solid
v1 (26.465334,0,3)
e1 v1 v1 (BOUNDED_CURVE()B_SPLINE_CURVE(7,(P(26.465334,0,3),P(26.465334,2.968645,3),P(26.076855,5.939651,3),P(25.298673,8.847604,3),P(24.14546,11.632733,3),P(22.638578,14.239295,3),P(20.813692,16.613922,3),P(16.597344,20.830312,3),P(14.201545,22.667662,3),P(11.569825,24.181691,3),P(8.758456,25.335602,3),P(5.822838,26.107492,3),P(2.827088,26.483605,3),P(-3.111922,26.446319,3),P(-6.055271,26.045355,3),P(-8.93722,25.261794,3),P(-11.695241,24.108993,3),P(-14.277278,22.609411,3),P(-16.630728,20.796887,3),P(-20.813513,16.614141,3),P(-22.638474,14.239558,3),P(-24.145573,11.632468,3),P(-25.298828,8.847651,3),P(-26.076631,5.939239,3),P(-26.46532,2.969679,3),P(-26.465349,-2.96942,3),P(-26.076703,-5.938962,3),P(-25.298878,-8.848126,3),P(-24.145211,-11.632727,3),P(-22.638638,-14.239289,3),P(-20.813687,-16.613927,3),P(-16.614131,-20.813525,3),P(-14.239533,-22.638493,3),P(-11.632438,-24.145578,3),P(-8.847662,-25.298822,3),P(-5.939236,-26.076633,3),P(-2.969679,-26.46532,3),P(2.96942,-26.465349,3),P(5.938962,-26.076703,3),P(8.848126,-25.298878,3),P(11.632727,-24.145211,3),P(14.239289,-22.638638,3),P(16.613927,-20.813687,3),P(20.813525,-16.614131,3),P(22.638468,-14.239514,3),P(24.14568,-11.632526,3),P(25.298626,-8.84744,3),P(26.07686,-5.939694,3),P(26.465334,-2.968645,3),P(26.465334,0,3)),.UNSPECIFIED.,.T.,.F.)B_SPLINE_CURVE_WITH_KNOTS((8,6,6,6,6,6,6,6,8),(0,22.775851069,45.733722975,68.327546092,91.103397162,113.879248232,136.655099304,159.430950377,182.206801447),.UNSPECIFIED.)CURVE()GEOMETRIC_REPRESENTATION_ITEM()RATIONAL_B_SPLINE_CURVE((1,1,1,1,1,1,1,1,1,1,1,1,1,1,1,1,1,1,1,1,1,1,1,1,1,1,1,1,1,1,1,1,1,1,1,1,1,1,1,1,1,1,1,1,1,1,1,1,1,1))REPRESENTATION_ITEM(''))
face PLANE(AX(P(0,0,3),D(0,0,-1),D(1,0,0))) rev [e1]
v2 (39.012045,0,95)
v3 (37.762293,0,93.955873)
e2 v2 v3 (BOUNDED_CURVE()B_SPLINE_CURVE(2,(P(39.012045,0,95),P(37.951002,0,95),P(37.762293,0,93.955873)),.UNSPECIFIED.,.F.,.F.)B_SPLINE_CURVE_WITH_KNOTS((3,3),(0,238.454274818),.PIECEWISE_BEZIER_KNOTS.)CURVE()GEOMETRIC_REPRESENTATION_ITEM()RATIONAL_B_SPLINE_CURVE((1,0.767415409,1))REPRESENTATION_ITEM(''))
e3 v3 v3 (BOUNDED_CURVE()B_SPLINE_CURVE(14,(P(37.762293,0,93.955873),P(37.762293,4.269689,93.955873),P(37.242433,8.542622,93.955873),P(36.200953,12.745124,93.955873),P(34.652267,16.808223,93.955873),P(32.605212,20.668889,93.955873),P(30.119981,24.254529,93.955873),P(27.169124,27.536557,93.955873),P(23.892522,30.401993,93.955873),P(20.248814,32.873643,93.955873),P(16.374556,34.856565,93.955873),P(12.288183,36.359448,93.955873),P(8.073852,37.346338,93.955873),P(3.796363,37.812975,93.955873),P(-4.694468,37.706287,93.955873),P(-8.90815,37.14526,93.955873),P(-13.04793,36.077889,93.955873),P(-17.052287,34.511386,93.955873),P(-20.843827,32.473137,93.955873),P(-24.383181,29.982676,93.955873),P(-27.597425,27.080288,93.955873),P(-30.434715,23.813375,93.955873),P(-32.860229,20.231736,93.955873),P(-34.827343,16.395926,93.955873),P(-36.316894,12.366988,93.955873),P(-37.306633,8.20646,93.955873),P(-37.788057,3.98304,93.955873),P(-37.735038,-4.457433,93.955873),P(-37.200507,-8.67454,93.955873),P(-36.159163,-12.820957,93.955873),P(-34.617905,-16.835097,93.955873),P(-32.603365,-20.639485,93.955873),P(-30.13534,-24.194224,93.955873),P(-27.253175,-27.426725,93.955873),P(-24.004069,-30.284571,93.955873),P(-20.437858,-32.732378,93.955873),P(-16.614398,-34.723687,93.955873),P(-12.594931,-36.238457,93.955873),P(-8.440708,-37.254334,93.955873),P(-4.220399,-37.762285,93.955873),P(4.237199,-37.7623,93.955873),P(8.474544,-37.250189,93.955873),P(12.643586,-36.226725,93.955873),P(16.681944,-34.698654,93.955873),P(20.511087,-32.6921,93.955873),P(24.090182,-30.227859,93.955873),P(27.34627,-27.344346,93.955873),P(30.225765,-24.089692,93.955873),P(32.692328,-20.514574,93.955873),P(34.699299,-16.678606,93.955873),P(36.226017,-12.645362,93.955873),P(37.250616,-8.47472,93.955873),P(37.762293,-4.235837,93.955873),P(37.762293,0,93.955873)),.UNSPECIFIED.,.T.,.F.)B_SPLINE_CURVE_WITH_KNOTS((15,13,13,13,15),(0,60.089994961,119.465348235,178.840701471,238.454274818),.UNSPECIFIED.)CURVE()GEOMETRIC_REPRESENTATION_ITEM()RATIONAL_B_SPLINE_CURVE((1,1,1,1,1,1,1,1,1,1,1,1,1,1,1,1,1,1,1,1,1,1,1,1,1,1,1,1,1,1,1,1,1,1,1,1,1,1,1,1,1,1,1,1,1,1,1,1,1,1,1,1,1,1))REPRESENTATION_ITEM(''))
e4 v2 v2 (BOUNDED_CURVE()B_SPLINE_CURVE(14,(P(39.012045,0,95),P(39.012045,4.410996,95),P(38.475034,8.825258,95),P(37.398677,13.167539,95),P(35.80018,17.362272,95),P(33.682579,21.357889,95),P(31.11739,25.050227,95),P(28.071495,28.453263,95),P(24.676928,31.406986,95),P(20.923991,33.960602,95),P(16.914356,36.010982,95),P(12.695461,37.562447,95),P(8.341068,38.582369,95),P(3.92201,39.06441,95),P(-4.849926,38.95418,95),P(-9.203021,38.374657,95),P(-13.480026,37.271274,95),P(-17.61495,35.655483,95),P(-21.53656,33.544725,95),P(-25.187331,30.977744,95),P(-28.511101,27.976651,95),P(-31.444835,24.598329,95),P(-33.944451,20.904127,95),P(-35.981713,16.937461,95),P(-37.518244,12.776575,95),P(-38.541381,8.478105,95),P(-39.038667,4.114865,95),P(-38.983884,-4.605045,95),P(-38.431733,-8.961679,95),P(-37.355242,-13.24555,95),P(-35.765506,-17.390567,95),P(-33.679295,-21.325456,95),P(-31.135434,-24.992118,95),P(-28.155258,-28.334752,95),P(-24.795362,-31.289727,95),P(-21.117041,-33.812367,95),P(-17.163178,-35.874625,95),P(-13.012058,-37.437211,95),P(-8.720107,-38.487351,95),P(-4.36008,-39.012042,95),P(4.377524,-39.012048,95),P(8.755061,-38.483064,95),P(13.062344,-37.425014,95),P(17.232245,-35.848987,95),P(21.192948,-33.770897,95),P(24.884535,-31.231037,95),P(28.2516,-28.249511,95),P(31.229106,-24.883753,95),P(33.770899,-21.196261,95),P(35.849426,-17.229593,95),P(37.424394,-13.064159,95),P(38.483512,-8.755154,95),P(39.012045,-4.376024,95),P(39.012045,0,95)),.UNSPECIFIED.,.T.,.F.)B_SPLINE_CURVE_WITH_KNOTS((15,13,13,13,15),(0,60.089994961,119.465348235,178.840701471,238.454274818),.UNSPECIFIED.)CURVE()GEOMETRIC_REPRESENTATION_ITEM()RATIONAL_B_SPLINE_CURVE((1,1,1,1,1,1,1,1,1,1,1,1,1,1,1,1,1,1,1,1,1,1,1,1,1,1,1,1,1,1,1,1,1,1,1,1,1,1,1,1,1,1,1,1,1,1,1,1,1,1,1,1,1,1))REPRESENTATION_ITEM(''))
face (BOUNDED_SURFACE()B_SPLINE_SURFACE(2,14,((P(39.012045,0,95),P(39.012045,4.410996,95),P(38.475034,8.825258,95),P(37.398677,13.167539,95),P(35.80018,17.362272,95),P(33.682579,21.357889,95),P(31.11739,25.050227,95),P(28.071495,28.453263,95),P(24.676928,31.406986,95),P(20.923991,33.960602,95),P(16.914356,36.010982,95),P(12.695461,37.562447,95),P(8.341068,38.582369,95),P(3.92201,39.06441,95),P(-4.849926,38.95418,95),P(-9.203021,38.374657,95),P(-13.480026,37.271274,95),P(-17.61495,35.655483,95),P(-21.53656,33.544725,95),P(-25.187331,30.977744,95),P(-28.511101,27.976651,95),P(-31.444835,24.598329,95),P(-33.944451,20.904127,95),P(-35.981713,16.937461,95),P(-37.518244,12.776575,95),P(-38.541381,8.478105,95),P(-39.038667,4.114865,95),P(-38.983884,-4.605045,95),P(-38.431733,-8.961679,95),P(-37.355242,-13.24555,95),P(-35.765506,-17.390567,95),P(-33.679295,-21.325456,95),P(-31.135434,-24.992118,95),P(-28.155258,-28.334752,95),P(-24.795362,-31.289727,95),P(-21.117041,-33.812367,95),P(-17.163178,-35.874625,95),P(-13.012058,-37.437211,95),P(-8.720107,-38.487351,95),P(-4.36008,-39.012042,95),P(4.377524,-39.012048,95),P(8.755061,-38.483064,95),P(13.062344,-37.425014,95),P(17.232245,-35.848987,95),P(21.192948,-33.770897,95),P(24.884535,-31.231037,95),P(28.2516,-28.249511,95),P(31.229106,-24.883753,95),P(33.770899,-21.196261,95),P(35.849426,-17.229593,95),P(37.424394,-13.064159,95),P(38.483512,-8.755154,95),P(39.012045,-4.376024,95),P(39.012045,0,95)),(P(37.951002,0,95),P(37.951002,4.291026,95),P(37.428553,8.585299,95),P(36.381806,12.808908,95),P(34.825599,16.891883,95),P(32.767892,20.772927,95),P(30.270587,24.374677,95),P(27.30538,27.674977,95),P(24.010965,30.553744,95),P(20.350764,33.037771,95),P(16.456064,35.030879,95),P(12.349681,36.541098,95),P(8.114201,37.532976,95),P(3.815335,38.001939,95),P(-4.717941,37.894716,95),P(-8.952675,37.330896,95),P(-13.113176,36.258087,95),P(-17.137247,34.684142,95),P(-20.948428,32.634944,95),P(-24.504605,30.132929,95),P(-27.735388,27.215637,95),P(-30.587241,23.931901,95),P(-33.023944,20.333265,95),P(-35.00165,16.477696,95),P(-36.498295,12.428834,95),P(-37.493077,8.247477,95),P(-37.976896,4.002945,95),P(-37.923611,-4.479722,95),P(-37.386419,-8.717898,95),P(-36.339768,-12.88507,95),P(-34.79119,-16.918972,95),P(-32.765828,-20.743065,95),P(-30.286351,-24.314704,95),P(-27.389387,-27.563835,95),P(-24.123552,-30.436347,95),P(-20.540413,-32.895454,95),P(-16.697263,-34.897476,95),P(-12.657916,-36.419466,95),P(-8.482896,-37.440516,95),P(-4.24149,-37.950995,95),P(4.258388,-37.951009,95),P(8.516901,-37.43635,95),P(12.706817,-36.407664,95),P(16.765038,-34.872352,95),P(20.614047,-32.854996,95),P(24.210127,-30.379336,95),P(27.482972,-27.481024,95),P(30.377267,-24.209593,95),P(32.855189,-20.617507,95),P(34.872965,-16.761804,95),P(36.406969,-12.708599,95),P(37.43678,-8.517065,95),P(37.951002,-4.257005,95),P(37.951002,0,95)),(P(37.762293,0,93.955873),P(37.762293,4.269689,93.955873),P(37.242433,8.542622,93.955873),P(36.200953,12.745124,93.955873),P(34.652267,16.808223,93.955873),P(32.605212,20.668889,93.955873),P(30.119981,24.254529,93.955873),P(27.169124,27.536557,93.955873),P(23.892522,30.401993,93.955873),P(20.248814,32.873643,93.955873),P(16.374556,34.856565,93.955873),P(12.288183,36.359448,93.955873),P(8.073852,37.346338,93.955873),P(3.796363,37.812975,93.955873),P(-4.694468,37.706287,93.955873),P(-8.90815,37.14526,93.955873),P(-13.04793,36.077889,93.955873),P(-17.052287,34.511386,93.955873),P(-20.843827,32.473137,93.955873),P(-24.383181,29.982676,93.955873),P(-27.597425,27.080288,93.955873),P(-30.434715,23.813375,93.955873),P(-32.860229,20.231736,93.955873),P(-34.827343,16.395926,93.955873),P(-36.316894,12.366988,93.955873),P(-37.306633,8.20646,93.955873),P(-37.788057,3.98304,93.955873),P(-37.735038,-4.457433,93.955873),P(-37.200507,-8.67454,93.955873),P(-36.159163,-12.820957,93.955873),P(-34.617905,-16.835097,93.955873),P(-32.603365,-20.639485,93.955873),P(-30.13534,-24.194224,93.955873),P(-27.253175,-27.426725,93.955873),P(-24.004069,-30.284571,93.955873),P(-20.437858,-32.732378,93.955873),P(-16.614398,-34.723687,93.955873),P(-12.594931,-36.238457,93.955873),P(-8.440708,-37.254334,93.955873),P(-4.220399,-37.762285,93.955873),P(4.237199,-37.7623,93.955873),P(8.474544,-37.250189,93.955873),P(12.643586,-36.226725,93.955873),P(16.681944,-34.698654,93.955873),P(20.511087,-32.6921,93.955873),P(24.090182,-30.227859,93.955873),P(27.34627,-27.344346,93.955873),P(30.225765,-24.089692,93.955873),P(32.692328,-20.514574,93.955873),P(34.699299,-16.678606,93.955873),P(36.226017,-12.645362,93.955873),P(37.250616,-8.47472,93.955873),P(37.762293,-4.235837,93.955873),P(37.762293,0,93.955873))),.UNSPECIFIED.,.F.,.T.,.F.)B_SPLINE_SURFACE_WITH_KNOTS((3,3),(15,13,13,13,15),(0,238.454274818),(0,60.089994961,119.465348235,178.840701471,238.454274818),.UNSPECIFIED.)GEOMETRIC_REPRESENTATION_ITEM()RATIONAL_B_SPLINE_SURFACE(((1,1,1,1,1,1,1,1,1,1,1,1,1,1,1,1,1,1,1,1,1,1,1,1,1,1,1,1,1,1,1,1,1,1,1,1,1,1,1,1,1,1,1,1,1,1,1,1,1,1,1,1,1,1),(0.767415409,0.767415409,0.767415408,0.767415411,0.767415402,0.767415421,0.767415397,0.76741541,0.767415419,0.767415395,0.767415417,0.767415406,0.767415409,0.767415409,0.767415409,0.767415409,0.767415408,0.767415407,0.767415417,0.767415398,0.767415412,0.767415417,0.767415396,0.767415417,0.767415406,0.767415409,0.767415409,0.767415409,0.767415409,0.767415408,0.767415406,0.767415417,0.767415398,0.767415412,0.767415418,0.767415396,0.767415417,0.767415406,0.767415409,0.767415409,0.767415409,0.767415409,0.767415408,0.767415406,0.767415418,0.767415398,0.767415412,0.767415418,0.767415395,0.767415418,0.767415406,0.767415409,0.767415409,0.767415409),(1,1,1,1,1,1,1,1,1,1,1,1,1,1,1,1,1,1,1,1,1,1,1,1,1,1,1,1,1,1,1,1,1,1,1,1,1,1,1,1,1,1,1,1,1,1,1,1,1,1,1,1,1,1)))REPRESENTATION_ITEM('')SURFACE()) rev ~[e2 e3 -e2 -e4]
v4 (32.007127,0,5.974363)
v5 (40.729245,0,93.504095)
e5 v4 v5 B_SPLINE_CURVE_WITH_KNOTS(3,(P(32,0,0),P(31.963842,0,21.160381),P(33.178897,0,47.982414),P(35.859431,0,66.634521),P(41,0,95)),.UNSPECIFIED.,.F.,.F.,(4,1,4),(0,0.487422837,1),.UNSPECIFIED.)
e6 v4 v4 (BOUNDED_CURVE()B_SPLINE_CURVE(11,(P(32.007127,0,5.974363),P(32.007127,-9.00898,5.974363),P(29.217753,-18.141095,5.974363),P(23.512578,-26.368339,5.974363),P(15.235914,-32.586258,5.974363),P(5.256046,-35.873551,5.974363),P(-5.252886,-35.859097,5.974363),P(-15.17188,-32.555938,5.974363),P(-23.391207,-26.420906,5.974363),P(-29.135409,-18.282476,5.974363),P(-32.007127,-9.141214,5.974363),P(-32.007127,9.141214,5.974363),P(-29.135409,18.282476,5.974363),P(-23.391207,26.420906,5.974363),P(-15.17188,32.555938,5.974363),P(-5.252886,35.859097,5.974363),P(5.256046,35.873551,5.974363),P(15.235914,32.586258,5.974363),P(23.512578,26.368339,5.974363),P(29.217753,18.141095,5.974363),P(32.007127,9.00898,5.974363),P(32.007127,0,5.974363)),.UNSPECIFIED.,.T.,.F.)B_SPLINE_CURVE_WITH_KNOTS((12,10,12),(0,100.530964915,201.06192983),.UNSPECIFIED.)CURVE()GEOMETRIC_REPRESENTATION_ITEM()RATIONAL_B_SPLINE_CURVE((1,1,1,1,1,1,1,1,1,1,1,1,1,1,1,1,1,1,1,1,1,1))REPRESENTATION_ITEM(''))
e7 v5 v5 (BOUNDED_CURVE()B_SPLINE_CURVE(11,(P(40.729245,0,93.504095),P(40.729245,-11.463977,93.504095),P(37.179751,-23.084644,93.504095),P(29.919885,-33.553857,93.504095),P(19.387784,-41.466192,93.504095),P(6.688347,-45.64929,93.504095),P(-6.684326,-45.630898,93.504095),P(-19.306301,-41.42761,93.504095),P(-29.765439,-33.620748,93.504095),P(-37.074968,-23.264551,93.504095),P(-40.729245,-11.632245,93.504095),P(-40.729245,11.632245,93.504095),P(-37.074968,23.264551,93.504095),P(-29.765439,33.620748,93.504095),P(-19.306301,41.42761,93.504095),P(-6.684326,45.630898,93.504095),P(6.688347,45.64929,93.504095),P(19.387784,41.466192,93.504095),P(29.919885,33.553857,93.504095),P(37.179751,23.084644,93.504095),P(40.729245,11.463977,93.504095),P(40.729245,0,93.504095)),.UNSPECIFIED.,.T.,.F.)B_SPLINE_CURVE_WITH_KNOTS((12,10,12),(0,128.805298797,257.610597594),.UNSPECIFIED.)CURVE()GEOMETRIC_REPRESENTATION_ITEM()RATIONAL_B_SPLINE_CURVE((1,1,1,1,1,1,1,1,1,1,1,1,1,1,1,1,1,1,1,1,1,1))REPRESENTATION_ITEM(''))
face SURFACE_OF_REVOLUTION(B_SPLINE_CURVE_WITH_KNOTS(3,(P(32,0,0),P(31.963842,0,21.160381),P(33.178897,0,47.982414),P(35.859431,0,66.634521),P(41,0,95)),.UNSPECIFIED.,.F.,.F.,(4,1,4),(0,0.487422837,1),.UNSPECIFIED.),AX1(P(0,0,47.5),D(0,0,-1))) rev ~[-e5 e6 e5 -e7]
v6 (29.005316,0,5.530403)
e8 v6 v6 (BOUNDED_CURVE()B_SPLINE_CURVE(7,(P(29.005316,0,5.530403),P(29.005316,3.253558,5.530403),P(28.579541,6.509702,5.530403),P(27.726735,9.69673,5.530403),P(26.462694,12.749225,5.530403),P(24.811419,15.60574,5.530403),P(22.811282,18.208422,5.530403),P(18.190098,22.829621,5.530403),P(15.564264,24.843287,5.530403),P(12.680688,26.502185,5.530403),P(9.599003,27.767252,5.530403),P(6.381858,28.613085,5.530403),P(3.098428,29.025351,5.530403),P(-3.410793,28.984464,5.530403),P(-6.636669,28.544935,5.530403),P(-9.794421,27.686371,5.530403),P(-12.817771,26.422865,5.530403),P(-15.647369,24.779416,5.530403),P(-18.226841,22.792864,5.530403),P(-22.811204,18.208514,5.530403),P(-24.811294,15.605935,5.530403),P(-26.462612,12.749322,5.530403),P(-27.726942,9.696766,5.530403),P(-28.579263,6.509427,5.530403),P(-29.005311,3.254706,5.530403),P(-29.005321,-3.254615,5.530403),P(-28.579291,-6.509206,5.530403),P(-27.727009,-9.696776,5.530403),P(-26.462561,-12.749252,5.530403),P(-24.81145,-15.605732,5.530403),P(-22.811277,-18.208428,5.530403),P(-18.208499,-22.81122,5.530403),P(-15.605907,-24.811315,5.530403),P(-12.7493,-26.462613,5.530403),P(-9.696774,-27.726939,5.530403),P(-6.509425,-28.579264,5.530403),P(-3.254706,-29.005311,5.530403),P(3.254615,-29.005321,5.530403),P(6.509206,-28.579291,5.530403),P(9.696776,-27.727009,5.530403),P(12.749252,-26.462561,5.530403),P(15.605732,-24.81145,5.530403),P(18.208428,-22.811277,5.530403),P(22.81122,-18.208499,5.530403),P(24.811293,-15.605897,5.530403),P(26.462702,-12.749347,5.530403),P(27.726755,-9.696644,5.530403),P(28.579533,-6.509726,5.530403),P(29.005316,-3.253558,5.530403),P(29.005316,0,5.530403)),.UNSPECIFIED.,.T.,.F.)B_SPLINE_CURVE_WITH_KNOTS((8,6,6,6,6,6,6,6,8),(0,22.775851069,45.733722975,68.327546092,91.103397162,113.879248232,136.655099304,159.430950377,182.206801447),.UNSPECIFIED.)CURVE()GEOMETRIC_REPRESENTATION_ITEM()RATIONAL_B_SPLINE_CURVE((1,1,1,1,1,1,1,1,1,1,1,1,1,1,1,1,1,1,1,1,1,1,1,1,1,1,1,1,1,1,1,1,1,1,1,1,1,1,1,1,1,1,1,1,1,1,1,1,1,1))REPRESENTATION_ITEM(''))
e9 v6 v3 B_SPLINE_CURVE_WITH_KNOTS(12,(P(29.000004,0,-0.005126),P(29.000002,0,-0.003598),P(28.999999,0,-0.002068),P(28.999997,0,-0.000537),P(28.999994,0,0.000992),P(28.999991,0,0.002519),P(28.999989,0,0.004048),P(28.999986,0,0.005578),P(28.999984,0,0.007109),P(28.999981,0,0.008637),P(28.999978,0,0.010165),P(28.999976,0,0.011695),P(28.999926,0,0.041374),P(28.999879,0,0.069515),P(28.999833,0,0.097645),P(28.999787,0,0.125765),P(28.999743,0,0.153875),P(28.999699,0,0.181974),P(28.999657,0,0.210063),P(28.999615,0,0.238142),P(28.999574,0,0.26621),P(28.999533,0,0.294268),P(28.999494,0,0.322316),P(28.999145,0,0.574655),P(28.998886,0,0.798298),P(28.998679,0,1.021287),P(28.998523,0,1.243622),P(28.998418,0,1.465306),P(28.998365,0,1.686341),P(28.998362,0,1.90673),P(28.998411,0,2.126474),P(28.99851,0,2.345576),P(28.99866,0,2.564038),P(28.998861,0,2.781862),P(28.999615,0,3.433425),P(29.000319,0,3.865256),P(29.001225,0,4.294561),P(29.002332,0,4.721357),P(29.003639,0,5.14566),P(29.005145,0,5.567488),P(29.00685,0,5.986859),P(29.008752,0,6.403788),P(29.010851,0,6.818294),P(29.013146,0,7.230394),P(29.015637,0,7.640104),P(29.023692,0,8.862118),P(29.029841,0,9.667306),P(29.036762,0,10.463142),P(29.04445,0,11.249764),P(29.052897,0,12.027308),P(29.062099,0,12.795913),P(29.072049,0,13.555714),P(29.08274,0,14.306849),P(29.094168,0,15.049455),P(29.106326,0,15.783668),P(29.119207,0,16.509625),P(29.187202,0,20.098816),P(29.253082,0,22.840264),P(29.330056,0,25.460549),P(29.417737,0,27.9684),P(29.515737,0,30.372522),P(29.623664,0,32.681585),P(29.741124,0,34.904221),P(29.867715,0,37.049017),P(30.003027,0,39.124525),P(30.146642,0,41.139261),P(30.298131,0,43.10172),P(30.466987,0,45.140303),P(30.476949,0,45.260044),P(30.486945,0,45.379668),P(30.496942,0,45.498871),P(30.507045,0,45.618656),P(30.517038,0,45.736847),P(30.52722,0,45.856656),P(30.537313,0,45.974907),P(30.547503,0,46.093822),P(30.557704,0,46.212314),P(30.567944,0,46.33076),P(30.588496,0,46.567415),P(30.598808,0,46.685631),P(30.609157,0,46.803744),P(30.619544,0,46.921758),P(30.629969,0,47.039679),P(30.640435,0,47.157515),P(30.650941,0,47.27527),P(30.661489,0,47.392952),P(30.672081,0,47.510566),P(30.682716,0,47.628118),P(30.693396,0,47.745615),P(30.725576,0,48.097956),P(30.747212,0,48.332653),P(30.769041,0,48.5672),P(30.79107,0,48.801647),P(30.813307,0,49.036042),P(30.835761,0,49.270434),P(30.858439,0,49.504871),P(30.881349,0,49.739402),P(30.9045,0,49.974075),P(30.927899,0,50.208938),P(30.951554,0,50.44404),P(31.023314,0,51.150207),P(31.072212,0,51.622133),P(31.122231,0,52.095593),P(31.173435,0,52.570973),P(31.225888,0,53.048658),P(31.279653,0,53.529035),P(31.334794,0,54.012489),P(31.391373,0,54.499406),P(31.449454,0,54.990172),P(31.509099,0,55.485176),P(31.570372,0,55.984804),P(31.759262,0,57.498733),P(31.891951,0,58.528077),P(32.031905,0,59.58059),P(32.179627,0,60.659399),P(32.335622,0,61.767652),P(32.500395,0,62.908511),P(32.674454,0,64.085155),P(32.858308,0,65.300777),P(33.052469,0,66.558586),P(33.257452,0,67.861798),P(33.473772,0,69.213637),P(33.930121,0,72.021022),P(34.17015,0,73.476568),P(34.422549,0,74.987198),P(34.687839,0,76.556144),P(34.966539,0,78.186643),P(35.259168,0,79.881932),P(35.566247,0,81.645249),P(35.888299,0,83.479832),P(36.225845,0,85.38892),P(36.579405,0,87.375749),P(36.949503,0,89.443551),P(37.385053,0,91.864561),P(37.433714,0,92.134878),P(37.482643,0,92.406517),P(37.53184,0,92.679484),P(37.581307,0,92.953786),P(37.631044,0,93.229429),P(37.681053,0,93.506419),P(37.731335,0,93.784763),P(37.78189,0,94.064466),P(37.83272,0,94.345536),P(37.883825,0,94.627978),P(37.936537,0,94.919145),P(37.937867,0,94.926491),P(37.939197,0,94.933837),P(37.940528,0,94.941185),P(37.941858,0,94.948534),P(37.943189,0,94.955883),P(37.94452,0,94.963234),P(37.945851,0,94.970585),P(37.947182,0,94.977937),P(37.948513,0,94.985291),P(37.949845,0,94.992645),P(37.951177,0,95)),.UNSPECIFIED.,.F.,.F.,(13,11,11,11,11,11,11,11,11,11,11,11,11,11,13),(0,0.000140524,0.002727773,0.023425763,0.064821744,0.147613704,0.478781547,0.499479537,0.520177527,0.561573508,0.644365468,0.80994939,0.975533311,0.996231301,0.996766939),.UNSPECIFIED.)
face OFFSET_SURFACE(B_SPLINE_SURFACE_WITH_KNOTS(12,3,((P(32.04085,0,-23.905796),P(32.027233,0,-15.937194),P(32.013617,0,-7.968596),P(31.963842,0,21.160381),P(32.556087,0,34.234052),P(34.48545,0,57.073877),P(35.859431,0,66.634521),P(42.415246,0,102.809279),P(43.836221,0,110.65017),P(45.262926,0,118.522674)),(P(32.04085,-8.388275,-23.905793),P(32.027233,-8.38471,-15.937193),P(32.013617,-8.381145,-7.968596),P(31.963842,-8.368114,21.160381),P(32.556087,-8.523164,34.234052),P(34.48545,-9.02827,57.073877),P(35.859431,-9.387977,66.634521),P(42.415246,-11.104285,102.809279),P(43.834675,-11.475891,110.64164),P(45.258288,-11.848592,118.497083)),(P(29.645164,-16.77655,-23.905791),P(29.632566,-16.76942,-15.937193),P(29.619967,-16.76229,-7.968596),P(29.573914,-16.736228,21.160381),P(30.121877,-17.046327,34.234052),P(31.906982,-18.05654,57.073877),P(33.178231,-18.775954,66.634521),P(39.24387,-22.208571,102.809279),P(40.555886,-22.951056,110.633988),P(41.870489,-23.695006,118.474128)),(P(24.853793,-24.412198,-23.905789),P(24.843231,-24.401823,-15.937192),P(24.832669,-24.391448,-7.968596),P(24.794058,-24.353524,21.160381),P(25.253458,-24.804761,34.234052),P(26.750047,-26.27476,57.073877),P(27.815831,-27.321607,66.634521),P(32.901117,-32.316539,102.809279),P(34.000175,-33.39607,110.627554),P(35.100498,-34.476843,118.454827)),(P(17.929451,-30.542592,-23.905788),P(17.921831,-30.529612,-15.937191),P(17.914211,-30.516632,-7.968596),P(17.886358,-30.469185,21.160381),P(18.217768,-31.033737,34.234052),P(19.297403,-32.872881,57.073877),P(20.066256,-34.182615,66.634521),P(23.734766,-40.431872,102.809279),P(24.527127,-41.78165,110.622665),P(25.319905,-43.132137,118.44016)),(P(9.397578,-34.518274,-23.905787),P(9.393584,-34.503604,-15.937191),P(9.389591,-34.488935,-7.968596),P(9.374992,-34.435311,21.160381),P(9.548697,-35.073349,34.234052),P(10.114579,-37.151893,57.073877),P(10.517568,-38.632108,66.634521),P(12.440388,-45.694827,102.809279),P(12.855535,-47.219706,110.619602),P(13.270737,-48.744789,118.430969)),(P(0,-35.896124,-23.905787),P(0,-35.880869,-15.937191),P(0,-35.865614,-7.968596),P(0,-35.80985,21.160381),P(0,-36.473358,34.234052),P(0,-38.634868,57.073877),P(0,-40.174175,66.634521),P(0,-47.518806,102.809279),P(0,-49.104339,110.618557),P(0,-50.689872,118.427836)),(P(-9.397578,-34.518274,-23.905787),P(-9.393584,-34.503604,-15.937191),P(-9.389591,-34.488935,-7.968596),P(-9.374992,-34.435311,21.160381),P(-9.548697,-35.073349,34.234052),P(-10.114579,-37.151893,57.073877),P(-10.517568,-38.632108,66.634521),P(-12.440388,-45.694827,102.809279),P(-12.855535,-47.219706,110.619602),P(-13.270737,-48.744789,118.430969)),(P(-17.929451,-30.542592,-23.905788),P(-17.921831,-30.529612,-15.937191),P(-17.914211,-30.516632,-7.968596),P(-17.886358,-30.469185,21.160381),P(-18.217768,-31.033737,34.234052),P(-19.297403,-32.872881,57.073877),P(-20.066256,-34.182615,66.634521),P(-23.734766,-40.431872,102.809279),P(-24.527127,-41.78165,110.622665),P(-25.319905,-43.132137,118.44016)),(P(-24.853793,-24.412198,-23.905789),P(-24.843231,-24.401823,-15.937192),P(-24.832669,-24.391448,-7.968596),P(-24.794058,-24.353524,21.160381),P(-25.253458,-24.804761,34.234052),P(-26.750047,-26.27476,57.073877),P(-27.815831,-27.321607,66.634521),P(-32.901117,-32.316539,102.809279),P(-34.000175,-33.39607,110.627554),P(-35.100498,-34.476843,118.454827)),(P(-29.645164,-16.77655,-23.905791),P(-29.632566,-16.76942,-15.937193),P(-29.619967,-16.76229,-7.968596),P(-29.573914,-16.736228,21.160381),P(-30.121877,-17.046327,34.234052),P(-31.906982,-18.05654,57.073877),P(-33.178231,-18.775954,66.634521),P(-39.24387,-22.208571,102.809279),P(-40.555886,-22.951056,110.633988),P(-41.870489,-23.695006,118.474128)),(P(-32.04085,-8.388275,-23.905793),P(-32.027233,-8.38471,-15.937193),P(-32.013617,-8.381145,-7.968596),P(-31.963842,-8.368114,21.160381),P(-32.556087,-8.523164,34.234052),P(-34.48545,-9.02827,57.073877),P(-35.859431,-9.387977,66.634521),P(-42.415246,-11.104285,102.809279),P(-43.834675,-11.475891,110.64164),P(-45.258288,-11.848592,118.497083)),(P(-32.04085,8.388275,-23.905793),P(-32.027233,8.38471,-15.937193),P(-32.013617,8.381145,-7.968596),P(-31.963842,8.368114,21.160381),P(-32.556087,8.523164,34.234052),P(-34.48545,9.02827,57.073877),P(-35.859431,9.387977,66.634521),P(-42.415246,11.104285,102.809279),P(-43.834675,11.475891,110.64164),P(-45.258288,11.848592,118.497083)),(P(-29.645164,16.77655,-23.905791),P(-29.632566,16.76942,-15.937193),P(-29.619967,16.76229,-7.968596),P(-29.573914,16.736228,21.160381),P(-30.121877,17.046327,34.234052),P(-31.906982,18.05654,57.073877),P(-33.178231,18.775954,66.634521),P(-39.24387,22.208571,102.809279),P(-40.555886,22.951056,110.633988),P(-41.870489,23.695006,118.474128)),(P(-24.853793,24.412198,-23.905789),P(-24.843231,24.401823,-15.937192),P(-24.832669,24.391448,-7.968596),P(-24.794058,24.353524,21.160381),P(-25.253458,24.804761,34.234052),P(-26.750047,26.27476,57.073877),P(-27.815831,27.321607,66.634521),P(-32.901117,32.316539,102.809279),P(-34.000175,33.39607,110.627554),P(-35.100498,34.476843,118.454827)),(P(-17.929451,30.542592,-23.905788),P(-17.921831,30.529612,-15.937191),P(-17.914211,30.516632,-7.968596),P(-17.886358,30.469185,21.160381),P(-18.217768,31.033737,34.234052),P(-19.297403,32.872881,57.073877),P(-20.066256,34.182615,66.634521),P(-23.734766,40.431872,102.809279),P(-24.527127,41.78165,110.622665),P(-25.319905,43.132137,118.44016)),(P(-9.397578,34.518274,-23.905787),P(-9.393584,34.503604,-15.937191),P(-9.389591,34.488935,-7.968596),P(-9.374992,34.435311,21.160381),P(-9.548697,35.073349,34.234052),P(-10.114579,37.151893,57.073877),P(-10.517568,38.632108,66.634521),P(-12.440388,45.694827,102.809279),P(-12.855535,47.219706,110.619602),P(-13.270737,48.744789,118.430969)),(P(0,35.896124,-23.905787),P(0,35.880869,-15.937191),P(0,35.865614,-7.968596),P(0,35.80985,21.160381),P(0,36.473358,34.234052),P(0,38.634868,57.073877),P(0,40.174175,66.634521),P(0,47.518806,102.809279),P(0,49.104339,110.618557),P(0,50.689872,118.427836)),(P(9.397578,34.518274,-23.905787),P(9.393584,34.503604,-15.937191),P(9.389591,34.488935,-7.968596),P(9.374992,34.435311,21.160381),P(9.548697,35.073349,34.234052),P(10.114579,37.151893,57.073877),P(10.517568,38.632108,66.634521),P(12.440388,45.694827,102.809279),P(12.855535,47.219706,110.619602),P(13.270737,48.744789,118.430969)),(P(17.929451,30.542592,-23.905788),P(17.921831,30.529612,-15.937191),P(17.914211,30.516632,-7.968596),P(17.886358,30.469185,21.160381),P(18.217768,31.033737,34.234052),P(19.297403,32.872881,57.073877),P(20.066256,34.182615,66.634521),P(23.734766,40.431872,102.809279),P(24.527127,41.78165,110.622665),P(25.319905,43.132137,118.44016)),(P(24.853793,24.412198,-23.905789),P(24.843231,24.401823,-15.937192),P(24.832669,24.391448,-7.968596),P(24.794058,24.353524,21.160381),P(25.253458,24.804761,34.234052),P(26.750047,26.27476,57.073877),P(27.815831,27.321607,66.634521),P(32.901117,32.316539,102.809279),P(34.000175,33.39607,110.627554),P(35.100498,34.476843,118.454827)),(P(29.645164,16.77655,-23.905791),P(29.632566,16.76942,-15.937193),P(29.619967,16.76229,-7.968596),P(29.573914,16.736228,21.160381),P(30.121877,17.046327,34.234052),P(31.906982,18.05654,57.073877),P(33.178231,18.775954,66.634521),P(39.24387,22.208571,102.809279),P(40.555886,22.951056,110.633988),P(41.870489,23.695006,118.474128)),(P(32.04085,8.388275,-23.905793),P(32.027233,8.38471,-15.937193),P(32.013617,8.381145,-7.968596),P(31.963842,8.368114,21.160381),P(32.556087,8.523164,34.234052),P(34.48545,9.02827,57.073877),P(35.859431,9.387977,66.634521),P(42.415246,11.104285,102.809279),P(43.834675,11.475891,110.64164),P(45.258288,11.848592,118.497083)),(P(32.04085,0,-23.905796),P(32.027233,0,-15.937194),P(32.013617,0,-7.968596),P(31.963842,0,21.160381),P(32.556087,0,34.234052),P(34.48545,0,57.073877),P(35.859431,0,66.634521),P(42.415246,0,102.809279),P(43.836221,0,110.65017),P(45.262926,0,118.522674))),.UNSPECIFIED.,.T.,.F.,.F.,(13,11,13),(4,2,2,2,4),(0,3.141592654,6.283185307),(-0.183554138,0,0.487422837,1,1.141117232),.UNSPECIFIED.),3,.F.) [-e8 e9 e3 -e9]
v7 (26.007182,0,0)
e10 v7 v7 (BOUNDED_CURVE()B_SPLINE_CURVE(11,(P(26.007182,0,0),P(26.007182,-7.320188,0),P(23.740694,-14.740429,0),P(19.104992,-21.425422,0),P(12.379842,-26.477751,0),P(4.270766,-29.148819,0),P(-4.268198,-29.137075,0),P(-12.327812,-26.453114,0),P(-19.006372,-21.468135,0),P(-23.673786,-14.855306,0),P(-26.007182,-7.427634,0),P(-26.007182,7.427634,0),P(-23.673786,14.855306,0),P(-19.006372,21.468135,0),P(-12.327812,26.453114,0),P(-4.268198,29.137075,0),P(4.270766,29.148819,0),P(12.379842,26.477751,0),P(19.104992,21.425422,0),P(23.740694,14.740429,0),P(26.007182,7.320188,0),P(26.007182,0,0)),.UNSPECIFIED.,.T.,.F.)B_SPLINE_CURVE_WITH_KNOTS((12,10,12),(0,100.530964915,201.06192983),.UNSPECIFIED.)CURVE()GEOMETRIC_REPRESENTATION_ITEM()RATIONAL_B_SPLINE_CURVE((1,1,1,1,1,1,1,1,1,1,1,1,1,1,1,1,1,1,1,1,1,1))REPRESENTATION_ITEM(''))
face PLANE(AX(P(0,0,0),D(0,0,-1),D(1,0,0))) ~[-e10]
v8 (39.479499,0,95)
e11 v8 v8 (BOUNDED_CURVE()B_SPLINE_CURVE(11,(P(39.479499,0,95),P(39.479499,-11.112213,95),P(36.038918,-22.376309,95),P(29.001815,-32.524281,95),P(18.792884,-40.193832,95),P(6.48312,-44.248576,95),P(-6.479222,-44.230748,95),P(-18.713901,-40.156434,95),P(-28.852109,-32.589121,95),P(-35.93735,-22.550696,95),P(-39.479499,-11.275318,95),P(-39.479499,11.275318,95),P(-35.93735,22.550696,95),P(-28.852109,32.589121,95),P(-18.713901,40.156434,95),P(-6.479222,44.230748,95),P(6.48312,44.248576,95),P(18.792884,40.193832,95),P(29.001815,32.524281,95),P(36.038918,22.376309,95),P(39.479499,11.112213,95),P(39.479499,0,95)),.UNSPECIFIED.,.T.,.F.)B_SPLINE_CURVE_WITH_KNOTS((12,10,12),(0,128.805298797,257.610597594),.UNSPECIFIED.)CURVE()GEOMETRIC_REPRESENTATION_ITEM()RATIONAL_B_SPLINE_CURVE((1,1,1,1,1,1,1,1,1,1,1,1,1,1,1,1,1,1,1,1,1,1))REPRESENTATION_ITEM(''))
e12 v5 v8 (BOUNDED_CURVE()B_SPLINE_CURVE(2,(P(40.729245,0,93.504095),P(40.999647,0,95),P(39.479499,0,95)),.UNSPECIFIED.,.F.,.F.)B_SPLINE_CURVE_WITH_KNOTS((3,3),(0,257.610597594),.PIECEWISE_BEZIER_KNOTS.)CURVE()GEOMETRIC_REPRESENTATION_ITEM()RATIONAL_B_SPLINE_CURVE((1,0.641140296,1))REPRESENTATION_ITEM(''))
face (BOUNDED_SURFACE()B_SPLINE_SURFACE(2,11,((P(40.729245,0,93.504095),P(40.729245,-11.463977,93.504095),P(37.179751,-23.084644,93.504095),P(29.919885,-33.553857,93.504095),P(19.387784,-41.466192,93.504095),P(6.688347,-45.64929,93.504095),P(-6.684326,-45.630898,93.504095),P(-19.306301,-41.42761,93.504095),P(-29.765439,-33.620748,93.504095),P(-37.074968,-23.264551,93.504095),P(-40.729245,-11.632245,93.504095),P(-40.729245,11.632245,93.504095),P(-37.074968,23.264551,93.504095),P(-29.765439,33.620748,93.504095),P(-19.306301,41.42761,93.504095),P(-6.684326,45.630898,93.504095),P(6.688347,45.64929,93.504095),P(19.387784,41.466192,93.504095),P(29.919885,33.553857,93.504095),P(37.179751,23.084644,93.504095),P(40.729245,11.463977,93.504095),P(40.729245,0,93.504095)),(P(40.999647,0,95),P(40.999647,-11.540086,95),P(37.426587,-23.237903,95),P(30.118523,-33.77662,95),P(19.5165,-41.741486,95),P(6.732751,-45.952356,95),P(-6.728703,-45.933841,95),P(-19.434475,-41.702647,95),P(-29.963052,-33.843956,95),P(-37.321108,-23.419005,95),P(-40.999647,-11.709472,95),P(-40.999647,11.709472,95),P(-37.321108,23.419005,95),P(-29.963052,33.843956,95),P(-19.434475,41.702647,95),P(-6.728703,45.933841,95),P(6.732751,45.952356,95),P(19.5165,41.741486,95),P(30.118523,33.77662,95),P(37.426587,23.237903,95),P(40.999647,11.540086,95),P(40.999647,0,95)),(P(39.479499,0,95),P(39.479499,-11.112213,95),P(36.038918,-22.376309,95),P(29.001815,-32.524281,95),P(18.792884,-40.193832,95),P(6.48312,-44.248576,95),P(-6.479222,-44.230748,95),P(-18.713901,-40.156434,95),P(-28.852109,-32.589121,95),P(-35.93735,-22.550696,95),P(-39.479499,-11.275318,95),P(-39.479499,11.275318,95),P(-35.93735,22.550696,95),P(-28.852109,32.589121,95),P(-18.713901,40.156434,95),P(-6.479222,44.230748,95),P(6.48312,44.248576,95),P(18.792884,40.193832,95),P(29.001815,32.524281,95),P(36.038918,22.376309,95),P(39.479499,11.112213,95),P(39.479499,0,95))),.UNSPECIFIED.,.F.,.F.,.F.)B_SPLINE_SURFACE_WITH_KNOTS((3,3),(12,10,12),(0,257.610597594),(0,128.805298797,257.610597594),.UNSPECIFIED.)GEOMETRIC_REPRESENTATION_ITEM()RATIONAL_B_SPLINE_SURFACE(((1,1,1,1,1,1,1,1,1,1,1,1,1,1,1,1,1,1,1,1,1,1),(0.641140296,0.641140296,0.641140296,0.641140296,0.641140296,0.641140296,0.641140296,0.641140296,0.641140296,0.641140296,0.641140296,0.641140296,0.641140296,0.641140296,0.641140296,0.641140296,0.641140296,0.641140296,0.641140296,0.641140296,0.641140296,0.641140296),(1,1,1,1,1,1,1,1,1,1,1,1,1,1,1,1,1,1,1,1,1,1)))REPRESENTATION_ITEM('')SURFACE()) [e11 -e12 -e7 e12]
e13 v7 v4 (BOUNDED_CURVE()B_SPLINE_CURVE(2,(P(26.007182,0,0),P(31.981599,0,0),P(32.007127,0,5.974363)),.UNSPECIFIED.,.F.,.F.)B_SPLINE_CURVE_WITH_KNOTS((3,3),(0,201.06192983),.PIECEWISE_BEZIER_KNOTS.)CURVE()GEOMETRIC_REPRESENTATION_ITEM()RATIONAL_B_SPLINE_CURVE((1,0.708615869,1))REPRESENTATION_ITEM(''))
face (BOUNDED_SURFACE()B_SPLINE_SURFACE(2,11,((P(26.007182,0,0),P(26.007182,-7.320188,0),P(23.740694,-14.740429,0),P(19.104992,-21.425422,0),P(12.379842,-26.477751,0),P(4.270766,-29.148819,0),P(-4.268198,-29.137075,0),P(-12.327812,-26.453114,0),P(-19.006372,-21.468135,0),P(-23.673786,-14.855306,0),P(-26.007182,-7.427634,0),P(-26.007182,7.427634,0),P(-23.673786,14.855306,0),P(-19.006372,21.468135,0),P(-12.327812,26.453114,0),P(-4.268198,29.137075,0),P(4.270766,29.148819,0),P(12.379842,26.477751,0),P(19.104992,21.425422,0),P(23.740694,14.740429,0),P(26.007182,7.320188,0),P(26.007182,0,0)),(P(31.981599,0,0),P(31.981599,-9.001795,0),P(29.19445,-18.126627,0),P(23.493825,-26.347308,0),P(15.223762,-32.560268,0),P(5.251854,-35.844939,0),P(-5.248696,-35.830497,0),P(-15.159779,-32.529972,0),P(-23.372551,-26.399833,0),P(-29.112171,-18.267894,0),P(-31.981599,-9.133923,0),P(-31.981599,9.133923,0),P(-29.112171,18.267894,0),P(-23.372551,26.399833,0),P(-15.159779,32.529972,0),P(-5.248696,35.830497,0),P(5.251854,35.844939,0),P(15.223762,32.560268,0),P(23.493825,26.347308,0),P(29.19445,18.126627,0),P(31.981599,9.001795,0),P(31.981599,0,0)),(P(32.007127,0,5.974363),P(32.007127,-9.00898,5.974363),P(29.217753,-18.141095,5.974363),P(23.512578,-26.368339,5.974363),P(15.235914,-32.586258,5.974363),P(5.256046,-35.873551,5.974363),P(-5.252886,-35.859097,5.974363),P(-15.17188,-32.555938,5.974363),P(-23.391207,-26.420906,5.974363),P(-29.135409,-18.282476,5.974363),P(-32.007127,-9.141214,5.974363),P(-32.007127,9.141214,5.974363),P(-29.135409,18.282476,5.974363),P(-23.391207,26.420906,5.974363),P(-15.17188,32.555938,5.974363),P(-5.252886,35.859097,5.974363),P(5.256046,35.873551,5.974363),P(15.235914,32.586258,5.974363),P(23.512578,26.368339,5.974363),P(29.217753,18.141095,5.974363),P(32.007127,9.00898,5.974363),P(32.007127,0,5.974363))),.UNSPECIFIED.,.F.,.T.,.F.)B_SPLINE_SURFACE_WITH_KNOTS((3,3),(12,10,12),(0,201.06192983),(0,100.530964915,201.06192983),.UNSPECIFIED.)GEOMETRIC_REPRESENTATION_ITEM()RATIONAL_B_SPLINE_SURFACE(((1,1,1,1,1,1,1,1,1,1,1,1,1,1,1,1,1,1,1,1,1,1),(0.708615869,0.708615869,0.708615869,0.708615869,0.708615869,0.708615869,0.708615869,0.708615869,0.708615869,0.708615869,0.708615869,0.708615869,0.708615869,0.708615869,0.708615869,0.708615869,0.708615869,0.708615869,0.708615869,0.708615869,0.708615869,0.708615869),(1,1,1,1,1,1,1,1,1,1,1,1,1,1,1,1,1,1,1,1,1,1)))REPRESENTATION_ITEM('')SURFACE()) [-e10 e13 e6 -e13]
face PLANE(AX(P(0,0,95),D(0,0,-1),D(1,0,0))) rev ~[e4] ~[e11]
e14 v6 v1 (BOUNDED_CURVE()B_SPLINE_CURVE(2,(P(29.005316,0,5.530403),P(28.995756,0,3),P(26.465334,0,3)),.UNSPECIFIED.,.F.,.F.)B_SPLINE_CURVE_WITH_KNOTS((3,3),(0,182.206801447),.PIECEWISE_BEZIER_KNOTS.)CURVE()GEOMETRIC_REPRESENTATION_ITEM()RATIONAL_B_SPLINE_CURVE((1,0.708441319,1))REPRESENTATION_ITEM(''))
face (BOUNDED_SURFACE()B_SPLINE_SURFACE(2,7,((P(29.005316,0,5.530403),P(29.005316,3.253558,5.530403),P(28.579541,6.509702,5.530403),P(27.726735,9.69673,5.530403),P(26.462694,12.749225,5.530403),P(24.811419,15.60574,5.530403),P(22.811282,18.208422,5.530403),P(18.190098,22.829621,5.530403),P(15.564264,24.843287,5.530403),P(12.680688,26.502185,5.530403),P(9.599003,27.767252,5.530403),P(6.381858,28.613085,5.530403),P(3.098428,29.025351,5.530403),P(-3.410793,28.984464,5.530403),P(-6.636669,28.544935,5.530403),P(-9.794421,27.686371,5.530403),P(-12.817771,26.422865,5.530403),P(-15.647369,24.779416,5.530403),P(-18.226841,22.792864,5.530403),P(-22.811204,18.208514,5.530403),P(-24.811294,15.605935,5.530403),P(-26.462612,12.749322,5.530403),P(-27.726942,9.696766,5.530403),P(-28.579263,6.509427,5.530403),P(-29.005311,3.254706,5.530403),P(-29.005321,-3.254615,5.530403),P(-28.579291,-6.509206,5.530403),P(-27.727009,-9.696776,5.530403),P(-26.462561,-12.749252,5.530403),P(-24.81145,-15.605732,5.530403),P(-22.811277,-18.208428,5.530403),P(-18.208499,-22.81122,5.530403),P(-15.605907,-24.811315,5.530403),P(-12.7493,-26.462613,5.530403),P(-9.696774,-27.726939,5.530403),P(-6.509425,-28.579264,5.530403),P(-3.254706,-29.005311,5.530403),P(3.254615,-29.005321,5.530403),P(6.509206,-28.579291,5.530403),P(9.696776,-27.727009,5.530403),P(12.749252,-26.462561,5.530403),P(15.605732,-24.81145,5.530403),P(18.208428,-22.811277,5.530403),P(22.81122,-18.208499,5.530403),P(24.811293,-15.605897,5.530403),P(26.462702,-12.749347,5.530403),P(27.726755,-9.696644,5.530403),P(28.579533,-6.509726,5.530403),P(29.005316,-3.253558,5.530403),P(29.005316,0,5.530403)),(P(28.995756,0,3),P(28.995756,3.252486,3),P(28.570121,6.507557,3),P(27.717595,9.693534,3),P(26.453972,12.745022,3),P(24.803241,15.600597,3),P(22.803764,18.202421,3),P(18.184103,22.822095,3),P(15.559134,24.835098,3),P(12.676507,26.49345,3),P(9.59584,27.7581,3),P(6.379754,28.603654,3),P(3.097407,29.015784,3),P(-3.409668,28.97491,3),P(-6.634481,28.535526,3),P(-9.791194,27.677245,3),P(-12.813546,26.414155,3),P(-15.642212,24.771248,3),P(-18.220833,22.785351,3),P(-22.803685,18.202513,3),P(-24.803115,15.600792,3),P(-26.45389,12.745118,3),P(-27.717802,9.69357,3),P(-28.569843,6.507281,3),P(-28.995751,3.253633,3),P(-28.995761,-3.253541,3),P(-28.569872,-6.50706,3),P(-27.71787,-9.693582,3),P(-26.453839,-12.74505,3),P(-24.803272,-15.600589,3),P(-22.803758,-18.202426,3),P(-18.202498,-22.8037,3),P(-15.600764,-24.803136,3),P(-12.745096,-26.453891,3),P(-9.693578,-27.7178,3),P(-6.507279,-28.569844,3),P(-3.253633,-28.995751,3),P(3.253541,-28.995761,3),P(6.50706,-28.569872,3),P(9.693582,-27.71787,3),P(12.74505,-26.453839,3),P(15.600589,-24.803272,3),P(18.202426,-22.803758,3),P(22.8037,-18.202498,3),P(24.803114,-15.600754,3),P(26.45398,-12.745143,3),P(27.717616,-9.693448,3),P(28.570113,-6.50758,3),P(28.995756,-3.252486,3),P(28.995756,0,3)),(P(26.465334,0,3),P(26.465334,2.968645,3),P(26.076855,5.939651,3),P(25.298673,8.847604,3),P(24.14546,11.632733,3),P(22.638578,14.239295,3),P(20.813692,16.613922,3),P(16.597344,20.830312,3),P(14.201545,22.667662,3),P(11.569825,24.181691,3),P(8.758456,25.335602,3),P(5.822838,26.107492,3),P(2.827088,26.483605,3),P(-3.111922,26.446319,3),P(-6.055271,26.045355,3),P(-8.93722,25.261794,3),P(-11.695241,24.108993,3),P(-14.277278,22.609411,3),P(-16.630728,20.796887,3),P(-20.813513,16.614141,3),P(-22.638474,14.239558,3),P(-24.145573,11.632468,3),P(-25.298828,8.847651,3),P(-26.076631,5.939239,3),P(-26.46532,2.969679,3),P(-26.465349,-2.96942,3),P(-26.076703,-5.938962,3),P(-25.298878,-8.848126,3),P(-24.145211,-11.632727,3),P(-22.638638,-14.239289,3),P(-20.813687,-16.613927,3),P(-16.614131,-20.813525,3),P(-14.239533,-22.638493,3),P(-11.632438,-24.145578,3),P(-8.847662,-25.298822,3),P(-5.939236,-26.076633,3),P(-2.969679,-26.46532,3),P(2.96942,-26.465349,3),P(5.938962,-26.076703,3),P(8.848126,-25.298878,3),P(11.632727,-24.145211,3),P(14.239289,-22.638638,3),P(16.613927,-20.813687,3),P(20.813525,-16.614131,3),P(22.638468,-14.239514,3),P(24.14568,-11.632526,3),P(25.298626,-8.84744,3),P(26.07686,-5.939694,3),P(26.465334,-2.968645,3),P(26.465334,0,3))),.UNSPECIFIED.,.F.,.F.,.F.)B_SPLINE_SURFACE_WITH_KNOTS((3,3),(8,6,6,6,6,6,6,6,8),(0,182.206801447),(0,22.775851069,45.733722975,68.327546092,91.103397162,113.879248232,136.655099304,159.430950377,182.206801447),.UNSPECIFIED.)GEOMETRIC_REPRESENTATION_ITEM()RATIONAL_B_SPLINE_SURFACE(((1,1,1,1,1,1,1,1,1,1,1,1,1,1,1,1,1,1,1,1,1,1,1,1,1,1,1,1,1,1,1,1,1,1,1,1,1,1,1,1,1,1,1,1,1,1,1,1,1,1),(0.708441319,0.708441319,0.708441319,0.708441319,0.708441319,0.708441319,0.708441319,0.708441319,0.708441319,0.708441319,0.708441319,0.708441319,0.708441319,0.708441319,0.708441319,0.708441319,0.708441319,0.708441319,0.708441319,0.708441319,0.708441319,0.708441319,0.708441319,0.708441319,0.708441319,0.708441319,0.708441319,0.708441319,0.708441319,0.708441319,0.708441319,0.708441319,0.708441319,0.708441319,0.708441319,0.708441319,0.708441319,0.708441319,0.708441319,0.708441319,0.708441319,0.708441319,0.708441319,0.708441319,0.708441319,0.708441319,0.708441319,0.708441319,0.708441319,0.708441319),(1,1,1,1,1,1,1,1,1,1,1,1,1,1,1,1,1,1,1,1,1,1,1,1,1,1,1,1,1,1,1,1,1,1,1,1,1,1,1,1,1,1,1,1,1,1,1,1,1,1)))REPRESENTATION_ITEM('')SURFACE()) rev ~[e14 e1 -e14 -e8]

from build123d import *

# Parameters (mm, degrees)
F2_T = -3
F3_R = 6
F4_R = 1.27
F5_R = 2.54


# Not quite as in the source:
# - a feature names something its author has since deleted; it is built from what else it names


with BuildPart() as f1:
    # F0 (on Front) → F1 (revolve)
    with BuildSketch(Plane.XZ):
        with BuildLine():
            Line((0, 0), (32, 0))
            add(Edge.make_bspline(
                [(32, 0), (31.9638415047, 21.1603806981), (33.1788966398, 47.9824141738), (35.859430952, 66.6345209779), (41, 95)],
                knots=[0, 0, 0, 0, 0.4874228368, 1, 1, 1, 1], degree=3))
            Line((41, 95), (0, 95))
            Line((0, 95), (0, 0))
        make_face()
    revolve(axis=Axis((0, 0, 47.5), (0, 0, -1)))

    # F2
    f2_openings = [f1.faces().sort_by_distance(p)[0] for p in [
        (0, 0, 95),
    ]]
    offset(amount=F2_T, openings=f2_openings)

    # F3
    f3_edges = [f1.edges().sort_by_distance(p)[0] for p in [
        (-32, 0, 0),
    ]]
    fillet(f3_edges, radius=F3_R)

    # F4
    f4_edges = [f1.edges().sort_by_distance(p)[0] for p in [
        (-41, 0, 95),
        (-37.951177, 0, 95),
    ]]
    fillet(f4_edges, radius=F4_R)

    # F5
    f5_edges = [f1.edges().sort_by_distance(p)[0] for p in [
        (-28.999113, 0, 3),
    ]]
    fillet(f5_edges, radius=F5_R)


solid = f1.part
